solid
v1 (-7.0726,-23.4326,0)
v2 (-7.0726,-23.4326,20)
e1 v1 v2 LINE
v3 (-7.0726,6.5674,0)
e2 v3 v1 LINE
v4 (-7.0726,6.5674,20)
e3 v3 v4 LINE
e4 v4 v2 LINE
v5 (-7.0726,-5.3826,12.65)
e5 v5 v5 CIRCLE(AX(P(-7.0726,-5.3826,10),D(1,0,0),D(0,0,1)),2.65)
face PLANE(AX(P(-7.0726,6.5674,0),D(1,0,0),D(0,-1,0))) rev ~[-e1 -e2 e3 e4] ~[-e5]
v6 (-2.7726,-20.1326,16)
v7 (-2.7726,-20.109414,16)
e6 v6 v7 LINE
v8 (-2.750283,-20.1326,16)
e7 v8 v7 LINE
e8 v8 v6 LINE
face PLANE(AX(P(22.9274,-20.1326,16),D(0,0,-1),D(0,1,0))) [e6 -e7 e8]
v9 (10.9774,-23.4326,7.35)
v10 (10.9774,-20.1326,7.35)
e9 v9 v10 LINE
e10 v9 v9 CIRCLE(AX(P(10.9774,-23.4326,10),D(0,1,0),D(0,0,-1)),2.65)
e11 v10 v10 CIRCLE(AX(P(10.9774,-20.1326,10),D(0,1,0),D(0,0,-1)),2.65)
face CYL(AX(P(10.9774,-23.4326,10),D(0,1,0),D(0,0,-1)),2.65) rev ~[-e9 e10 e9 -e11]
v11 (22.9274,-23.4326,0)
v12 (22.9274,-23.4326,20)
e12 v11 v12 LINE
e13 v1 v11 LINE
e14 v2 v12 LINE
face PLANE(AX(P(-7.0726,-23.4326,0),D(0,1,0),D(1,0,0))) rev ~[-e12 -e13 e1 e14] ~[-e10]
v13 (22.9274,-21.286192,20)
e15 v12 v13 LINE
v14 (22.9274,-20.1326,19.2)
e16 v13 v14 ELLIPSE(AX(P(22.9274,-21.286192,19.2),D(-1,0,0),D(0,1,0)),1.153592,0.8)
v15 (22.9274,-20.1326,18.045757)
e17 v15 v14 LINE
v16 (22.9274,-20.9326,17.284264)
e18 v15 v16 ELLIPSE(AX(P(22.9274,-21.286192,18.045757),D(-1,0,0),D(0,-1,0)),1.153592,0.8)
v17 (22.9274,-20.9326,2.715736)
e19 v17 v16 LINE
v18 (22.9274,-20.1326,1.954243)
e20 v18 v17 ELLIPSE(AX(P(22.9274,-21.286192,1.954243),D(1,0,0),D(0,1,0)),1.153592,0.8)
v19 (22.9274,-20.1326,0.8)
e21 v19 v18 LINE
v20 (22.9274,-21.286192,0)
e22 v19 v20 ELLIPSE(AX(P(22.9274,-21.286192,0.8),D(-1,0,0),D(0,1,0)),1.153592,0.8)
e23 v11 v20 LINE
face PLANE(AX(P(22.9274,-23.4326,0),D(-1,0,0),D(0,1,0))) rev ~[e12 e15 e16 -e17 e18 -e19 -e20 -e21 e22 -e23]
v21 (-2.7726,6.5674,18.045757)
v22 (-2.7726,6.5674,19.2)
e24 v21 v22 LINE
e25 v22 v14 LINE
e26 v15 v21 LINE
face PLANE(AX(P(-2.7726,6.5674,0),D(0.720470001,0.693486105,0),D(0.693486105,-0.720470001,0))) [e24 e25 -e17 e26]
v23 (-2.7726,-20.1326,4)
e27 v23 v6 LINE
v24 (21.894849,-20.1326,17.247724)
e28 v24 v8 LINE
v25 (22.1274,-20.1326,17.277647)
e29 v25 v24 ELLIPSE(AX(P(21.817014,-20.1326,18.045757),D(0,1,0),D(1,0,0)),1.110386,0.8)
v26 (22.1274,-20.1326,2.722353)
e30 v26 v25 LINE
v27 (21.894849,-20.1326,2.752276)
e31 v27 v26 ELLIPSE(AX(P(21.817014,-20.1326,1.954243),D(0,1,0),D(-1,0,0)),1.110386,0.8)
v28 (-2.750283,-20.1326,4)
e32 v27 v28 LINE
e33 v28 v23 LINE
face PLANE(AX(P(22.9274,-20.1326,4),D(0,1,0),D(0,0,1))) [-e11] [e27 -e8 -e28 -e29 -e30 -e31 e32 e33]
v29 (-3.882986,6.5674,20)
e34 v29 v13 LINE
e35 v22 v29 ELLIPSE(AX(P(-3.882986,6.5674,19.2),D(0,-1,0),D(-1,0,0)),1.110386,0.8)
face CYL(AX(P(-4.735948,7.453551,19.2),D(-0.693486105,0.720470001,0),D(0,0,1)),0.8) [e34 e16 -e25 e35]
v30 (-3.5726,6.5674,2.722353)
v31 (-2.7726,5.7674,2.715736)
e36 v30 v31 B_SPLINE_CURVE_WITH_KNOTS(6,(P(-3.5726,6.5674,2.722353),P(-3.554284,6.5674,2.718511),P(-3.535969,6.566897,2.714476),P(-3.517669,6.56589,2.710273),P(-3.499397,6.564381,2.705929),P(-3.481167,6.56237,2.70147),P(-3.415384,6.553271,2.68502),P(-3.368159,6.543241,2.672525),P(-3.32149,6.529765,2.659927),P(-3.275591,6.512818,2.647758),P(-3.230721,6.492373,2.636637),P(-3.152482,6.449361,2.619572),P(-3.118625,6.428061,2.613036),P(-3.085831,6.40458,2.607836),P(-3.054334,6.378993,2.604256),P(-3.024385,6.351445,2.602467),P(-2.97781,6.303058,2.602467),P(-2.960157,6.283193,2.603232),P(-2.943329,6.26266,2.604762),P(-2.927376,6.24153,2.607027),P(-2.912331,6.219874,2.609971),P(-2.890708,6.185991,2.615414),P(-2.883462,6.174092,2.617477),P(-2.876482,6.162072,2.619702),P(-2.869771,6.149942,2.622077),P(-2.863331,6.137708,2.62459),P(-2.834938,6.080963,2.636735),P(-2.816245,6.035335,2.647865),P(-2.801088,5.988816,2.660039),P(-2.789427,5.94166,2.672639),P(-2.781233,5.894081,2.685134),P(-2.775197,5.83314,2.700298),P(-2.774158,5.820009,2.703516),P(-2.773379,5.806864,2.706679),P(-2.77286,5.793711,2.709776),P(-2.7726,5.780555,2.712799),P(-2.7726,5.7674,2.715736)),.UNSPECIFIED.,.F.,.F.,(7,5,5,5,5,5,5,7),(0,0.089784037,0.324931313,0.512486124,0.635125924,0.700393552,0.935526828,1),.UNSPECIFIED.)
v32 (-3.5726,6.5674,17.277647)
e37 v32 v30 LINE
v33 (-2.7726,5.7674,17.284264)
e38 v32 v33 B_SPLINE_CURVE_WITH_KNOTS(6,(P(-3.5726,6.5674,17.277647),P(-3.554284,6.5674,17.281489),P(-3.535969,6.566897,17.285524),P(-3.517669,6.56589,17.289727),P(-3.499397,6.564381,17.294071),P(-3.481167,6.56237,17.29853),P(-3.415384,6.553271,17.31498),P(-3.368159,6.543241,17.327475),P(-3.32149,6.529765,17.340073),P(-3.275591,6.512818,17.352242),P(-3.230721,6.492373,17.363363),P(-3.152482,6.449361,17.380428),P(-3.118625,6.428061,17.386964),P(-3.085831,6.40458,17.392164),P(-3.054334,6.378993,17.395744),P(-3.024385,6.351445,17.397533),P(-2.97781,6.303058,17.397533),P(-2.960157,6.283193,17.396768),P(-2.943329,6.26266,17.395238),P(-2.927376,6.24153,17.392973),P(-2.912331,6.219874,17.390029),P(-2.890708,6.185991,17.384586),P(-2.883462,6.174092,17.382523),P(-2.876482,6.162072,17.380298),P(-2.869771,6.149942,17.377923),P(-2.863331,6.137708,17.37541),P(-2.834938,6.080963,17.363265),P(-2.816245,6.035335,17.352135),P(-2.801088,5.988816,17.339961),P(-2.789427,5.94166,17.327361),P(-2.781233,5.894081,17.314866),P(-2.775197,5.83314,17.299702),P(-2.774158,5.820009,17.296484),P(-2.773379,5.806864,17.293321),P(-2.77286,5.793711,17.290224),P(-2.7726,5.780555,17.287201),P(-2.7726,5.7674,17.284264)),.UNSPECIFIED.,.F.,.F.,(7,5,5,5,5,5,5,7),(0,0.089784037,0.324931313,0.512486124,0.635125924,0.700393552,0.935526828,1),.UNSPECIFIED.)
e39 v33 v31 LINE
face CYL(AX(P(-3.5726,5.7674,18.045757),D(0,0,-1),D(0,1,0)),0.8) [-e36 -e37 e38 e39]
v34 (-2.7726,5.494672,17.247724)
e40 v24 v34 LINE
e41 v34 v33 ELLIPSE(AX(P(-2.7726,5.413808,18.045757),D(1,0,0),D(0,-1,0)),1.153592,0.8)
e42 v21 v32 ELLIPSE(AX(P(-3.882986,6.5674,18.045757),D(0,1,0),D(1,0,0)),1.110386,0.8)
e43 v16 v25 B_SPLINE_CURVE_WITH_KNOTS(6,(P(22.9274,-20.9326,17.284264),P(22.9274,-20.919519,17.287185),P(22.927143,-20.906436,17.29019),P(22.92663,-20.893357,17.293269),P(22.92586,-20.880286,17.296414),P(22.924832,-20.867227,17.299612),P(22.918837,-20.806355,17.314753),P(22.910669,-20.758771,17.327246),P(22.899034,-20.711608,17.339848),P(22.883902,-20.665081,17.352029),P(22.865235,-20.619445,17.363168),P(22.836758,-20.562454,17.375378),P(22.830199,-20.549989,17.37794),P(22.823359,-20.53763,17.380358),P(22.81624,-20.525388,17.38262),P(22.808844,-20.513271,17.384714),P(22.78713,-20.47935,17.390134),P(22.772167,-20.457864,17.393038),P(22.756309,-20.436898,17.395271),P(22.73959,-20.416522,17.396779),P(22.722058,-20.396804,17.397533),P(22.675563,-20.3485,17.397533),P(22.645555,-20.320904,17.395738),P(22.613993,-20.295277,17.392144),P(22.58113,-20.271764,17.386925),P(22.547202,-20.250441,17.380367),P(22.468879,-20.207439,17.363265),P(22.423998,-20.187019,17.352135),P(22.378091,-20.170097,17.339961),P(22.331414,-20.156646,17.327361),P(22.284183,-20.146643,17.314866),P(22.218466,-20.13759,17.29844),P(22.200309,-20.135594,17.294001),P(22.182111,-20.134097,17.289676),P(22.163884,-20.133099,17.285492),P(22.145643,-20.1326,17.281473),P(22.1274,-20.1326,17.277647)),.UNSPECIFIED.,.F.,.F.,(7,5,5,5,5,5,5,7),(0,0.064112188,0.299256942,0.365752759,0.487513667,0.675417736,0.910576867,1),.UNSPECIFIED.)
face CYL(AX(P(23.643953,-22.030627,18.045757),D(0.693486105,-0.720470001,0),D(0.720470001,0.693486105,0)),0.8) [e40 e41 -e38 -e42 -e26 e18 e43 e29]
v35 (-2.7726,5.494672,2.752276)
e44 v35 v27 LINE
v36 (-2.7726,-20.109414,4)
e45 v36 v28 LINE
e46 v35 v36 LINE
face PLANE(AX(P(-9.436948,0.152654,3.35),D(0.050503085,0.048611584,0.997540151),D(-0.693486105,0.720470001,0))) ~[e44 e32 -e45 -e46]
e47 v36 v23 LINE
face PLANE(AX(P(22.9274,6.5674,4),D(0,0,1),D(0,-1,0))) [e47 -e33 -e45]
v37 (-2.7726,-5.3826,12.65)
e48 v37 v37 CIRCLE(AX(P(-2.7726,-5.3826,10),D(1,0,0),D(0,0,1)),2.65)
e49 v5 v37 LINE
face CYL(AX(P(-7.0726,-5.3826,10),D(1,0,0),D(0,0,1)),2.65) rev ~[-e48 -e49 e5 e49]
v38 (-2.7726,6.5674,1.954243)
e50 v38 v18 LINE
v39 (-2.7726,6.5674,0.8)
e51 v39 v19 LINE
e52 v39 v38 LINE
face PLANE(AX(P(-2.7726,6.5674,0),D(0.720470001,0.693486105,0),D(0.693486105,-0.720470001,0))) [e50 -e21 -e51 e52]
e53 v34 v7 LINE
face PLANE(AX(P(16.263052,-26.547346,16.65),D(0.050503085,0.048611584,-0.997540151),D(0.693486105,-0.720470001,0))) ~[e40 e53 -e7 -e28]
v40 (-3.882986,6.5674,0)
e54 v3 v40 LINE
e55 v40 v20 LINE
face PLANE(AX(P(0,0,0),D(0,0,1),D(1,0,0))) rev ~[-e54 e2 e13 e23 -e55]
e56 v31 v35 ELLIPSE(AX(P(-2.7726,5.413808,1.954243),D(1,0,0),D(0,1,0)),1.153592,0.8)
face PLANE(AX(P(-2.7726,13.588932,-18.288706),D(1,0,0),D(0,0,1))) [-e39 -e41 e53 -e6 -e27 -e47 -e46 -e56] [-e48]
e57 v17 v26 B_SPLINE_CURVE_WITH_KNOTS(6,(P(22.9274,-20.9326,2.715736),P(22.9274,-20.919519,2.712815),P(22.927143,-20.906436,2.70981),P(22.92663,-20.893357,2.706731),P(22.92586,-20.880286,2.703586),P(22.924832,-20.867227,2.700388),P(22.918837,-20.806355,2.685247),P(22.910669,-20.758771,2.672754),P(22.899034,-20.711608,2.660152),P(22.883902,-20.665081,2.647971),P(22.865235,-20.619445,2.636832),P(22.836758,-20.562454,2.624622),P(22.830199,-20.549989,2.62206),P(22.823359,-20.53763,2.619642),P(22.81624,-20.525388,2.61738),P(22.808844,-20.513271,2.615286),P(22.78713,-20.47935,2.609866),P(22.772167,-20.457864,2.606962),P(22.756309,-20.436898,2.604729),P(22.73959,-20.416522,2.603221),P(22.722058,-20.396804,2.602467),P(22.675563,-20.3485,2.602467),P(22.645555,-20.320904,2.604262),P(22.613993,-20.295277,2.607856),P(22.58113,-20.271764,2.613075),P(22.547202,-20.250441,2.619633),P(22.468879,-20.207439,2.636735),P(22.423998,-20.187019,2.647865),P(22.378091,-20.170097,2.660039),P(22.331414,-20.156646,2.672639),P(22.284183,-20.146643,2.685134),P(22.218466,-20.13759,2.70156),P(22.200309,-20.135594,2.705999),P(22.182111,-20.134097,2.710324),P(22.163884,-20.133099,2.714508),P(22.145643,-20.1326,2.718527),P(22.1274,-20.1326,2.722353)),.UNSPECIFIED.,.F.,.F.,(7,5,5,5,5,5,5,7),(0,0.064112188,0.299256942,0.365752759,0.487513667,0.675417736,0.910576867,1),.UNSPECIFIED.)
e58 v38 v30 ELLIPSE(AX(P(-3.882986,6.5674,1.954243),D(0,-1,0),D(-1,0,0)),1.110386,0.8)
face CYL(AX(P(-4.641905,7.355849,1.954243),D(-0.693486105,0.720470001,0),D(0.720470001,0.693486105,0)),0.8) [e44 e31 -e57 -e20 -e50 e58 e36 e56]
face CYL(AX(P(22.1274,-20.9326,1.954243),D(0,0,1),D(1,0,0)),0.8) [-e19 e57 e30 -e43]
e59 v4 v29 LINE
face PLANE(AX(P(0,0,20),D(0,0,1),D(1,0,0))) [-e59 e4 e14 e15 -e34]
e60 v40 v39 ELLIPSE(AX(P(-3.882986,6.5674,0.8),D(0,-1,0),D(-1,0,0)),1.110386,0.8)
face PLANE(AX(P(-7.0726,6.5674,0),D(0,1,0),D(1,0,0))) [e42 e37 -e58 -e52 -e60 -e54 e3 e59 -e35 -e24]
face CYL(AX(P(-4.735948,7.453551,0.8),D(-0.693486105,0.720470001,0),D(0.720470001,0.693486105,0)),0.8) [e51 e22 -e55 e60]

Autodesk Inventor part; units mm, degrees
ref_plane "YZ Plane" through (0, 0, 0) normal (1, 0, 0) x (0, 1, 0)
ref_plane "XZ Plane" through (0, 0, 0) normal (0, 1, 0) x (-1, 0, 0)
ref_plane "XY Plane" through (0, 0, 0) normal (0, 0, 1) x (1, 0, 0)
sketch "Szkic1" plane through (0, 0, 0) normal (0, 0, 1) x (1, 0, 0)
  line L0 (-7.0726, 6.5674) -> (-7.0726, -23.4326)
  line L1 (-7.0726, -23.4326) -> (22.9274, -23.4326)
  line L2 (22.9274, -23.4326) -> (22.9274, -20.1326)
  line L3 (-7.0726, 6.5674) -> (-2.7726, 6.5674)
  line L4 (-2.7726, 6.5674) -> (22.9274, -20.1326)
  point P0 (0, 0)
  dimension "d0" = 30
  dimension "d1" = 30
  dimension "d2" = 3.3
  dimension "d3" = 4.3
extrude "Wyciągnięcie proste1" add sketch "Szkic1" along normal blind 20
sketch "Szkic2" plane through (22.9274, -23.4326, 0) normal (1, 0, 0) x (0, 0, -1)
  line L0 (0, 0) -> (0, 3.3) projected
  line L1 (0, 3.3) -> (-20, 3.3) projected
  line L2 (-20, 0) -> (-20, 3.3) projected
  line L3 (0, 0) -> (-20, 0) projected
  line L4 (0, 3.3) -> (0, 30) projected
  line L5 (0, 30) -> (-20, 30) projected
  line L6 (-20, 3.3) -> (-20, 30) projected
  line L7 (0, 3.3) -> (-20, 3.3) projected
  line L8 (0, 3.3) -> (-20, 3.3) projected
  line L9 (0, 30) -> (-20, 30) projected
  line L10 (-4, 3.3) -> (-16, 3.3)
  line L11 (-16, 3.3) -> (-16, 30)
  line L12 (-16, 30) -> (-4, 30)
  line L13 (-4, 30) -> (-4, 3.3)
  point P0 (0, 23.4326)
  dimension "d6" = 12
  dimension "d7" = 4
  dimension "d8" = 4
extrude "Wyciągnięcie proste2" cut sketch "Szkic2" against normal blind 25.7 contours L1 L11 L5 L13
chamfer "Faza1" distance 1.3 distance2 18.5 1 edges at (10.0774, -6.7826, 16) measured on face at (14.3607, -11.2326, 17.3333)
chamfer "Faza2" distance 1.3 distance2 18.5 1 edges at (10.0774, -6.7826, 4) measured on face at (5.7941, -2.3326, 2.6667)
fillet "Zaokrąglenie1" radius 0.8 4 edges at (10.0774, -6.7826, 17.3) (10.0774, -6.7826, 2.7) (10.0774, -6.7826, 20) (10.0774, -6.7826, 0)
fillet "Zaokrąglenie2" radius 0.8 2 edges at (22.9274, -20.1326, 10) (-2.7726, 6.5674, 10)
sketch "Szkic3" plane through (-7.0726, -23.4326, 0) normal (0, -1, 0) x (1, 0, 0)
  line L0 (0, 0) -> (30, 0) projected
  line L1 (30, 0) -> (30, 20) projected
  line L2 (0, 20) -> (30, 20) projected
  line L3 (0, 0) -> (0, 20) projected
  point P0 (7.0726, 0)
  point P1 (18.05, 10)
  dimension "d19" = 11.95
hole "Otwór1" at (10.9774, -23.4326, 10) direction (0, 1, 0) diameter 5.3 end through all
sketch "Szkic4" plane through (-7.0726, -23.4326, 0) normal (-1, 0, 0) x (0, 0, 1)
  line L0 (0, 30) -> (0, 0) projected
  line L1 (0, 0) -> (20, 0) projected
  line L2 (20, 30) -> (20, 0) projected
  line L3 (0, 30) -> (20, 30) projected
  point P0 (0, 23.4326)
  point P1 (10, 18.05)
  dimension "d27" = 11.95
hole "Otwór2" at (-7.0726, -5.3826, 10) direction (1, 0, 0) diameter 5.3 end through all
properties part number "COTS_GENERIC_20x20mm_Angle_Bracket" material "Stal nierdzewna 440C"
